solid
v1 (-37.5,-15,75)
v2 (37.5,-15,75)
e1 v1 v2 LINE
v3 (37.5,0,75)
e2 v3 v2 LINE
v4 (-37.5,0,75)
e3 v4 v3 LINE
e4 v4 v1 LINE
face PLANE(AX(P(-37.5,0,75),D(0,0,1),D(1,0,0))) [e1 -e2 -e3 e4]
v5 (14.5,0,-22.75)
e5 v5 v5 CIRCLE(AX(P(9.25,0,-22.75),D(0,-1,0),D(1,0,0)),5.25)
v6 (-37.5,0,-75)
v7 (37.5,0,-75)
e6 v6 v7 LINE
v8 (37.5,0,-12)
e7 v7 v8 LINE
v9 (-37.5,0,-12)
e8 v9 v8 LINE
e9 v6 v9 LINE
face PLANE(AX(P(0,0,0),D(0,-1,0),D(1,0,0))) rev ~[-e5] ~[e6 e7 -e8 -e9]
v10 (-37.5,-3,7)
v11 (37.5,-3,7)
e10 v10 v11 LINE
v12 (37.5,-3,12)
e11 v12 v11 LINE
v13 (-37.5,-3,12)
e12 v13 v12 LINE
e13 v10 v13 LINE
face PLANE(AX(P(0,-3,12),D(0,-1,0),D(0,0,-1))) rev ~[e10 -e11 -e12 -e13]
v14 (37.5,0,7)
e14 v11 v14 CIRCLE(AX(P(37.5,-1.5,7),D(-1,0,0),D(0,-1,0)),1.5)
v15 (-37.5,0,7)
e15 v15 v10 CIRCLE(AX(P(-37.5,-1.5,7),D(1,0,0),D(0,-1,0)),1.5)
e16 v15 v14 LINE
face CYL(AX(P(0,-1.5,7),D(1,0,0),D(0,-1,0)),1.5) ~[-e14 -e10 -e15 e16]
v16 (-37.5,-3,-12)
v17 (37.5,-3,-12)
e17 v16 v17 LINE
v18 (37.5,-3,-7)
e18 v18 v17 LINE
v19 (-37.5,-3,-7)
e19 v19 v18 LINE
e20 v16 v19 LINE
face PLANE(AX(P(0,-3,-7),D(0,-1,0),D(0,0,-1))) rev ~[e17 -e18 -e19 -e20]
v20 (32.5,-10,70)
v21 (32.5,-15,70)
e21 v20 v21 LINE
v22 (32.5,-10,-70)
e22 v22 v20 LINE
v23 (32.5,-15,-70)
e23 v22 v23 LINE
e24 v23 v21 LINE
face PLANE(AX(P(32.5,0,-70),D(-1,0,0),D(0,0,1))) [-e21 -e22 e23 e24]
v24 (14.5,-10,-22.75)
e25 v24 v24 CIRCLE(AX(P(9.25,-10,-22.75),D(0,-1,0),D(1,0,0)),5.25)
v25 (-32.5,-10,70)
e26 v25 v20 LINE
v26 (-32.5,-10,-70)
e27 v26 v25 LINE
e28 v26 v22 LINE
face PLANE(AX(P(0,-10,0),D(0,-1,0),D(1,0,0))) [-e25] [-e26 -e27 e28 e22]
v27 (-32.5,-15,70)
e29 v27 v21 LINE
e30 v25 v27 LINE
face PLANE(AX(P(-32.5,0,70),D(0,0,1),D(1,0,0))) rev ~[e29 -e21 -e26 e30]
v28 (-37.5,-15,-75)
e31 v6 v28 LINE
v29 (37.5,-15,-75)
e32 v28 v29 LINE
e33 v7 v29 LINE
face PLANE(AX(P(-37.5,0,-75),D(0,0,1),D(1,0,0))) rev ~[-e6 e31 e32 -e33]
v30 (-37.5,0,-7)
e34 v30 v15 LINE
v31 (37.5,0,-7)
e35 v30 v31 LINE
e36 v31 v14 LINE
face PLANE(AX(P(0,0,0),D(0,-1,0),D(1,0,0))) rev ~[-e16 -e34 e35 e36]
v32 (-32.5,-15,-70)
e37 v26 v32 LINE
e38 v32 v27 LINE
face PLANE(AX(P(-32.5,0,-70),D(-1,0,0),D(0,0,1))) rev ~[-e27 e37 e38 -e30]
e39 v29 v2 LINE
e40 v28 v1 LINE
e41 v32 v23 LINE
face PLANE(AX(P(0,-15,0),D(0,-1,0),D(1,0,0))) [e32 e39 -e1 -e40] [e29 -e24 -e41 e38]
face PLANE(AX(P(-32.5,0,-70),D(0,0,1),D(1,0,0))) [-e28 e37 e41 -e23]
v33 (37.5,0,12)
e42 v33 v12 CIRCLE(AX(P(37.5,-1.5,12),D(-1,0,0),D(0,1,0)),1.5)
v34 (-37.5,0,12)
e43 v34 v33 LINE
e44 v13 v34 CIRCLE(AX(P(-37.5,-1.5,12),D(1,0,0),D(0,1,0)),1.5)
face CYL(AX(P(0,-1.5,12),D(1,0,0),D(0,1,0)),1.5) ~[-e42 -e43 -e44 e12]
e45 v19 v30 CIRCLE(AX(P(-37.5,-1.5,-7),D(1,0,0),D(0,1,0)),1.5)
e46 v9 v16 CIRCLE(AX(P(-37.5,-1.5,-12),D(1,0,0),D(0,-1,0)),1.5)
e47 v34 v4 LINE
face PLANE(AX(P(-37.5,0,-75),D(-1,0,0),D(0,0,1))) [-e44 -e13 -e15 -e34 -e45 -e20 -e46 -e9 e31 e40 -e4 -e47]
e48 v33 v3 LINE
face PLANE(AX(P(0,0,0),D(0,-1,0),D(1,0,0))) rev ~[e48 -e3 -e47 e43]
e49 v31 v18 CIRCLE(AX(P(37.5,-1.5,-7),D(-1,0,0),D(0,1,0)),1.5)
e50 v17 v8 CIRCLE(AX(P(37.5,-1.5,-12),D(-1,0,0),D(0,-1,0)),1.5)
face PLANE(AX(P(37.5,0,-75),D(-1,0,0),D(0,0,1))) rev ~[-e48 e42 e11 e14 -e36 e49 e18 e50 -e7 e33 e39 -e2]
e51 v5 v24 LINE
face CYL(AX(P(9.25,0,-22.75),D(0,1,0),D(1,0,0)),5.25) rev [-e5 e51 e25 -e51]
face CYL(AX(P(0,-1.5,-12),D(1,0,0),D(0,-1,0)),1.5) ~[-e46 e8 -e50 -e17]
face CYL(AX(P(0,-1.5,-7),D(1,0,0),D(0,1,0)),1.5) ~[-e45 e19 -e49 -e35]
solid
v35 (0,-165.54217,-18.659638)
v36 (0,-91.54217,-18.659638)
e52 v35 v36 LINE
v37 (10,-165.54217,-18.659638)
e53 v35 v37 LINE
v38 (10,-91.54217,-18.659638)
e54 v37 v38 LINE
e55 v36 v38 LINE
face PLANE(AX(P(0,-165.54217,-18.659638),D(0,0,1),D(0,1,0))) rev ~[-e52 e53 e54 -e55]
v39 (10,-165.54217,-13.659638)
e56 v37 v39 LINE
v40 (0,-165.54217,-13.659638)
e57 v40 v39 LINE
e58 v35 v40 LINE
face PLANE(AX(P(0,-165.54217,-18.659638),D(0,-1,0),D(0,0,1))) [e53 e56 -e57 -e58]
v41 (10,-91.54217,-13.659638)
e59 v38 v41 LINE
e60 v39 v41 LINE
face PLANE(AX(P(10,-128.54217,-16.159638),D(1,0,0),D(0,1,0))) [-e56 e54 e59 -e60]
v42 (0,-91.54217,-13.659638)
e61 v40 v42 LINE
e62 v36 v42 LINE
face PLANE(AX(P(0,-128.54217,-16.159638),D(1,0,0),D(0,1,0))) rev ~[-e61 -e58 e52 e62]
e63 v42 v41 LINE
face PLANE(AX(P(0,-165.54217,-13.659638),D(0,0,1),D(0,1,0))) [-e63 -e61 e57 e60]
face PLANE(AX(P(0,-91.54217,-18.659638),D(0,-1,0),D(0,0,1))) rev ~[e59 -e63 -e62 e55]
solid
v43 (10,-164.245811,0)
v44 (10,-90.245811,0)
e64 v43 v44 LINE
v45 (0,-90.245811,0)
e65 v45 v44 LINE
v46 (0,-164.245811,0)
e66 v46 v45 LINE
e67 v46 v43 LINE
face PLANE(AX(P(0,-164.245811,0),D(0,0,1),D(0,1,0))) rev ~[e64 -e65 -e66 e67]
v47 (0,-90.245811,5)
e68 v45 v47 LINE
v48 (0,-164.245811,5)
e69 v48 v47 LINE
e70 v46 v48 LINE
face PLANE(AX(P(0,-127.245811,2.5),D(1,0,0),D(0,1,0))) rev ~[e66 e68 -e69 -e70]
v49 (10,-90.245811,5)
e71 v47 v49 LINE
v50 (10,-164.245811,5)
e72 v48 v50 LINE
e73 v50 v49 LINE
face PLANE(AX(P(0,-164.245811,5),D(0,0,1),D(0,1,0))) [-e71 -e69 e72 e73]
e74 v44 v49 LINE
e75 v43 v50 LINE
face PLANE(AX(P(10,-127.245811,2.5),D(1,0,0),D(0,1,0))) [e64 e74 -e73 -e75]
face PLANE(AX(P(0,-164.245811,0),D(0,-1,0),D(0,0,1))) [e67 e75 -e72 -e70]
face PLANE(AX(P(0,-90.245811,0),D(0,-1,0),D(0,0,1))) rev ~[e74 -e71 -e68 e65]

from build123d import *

# Parameters (mm, degrees)
F0_W          = 75
F0_H          = 150
F0_W_2        = 65
F0_H_2        = 140
F1_DEPTH      = 15
F0_R          = 5.25
F2_DEPTH      = 10
F3_W          = 74
F3_H          = 5
F4_DEPTH      = 10
F5_DEPTH      = 37.501
F5_DEPTH_BACK = 37.501


with BuildPart() as f1:
    # F0 (on Front) → F1 (new body)
    with BuildSketch(Plane.XZ):
        Rectangle(F0_W, F0_H)
        Rectangle(F0_W_2, F0_H_2, mode=Mode.SUBTRACT)
    extrude(amount=F1_DEPTH)

    # F0 (on Front) → F2 (join)
    with BuildSketch(Plane.XZ):
        Rectangle(F0_W_2, F0_H_2)
        with Locations((9.25, -22.75)):
            Circle(F0_R, mode=Mode.SUBTRACT)
    extrude(amount=F2_DEPTH)

    # F3 (on Right) → F5 (cut, two sides)
    with BuildSketch(Plane.YZ) as f5_sk:
        with Locations((-127.245810883, 2.5)):
            Rectangle(F3_W, F3_H)
        with Locations((-128.5421704054, -16.1596382409)):
            Rectangle(F3_W, F3_H)
        with BuildLine():
            Line((0, -12), (0, -7))
            ThreePointArc((0, -7), (-1.5, -8.5), (-3, -7))
            Line((-3, -7), (-3, -12))
            ThreePointArc((-3, -12), (-1.5, -10.5), (0, -12))
        make_face()
        with BuildLine():
            ThreePointArc((0, 12), (-1.5, 10.5), (-3, 12))
            Line((-3, 12), (-3, 7))
            ThreePointArc((-3, 7), (-1.5, 8.5), (0, 7))
            Line((0, 7), (0, 12))
        make_face()
    extrude(amount=F5_DEPTH, mode=Mode.SUBTRACT)
    extrude(f5_sk.sketch, amount=-F5_DEPTH_BACK, mode=Mode.SUBTRACT)


with BuildPart() as f4:
    # F3 (on Right) → F4 (new body)
    with BuildSketch(Plane.YZ):
        with Locations((-127.245810883, 2.5)):
            Rectangle(F3_W, F3_H)
    extrude(amount=F4_DEPTH)


with BuildPart() as f4b:
    # F3 (on Right) → F4, piece 2 (new body)
    with BuildSketch(Plane.YZ):
        with Locations((-128.5421704054, -16.1596382409)):
            Rectangle(F3_W, F3_H)
    extrude(amount=F4_DEPTH)


solid = Compound([f1.part, f4.part, f4b.part])
